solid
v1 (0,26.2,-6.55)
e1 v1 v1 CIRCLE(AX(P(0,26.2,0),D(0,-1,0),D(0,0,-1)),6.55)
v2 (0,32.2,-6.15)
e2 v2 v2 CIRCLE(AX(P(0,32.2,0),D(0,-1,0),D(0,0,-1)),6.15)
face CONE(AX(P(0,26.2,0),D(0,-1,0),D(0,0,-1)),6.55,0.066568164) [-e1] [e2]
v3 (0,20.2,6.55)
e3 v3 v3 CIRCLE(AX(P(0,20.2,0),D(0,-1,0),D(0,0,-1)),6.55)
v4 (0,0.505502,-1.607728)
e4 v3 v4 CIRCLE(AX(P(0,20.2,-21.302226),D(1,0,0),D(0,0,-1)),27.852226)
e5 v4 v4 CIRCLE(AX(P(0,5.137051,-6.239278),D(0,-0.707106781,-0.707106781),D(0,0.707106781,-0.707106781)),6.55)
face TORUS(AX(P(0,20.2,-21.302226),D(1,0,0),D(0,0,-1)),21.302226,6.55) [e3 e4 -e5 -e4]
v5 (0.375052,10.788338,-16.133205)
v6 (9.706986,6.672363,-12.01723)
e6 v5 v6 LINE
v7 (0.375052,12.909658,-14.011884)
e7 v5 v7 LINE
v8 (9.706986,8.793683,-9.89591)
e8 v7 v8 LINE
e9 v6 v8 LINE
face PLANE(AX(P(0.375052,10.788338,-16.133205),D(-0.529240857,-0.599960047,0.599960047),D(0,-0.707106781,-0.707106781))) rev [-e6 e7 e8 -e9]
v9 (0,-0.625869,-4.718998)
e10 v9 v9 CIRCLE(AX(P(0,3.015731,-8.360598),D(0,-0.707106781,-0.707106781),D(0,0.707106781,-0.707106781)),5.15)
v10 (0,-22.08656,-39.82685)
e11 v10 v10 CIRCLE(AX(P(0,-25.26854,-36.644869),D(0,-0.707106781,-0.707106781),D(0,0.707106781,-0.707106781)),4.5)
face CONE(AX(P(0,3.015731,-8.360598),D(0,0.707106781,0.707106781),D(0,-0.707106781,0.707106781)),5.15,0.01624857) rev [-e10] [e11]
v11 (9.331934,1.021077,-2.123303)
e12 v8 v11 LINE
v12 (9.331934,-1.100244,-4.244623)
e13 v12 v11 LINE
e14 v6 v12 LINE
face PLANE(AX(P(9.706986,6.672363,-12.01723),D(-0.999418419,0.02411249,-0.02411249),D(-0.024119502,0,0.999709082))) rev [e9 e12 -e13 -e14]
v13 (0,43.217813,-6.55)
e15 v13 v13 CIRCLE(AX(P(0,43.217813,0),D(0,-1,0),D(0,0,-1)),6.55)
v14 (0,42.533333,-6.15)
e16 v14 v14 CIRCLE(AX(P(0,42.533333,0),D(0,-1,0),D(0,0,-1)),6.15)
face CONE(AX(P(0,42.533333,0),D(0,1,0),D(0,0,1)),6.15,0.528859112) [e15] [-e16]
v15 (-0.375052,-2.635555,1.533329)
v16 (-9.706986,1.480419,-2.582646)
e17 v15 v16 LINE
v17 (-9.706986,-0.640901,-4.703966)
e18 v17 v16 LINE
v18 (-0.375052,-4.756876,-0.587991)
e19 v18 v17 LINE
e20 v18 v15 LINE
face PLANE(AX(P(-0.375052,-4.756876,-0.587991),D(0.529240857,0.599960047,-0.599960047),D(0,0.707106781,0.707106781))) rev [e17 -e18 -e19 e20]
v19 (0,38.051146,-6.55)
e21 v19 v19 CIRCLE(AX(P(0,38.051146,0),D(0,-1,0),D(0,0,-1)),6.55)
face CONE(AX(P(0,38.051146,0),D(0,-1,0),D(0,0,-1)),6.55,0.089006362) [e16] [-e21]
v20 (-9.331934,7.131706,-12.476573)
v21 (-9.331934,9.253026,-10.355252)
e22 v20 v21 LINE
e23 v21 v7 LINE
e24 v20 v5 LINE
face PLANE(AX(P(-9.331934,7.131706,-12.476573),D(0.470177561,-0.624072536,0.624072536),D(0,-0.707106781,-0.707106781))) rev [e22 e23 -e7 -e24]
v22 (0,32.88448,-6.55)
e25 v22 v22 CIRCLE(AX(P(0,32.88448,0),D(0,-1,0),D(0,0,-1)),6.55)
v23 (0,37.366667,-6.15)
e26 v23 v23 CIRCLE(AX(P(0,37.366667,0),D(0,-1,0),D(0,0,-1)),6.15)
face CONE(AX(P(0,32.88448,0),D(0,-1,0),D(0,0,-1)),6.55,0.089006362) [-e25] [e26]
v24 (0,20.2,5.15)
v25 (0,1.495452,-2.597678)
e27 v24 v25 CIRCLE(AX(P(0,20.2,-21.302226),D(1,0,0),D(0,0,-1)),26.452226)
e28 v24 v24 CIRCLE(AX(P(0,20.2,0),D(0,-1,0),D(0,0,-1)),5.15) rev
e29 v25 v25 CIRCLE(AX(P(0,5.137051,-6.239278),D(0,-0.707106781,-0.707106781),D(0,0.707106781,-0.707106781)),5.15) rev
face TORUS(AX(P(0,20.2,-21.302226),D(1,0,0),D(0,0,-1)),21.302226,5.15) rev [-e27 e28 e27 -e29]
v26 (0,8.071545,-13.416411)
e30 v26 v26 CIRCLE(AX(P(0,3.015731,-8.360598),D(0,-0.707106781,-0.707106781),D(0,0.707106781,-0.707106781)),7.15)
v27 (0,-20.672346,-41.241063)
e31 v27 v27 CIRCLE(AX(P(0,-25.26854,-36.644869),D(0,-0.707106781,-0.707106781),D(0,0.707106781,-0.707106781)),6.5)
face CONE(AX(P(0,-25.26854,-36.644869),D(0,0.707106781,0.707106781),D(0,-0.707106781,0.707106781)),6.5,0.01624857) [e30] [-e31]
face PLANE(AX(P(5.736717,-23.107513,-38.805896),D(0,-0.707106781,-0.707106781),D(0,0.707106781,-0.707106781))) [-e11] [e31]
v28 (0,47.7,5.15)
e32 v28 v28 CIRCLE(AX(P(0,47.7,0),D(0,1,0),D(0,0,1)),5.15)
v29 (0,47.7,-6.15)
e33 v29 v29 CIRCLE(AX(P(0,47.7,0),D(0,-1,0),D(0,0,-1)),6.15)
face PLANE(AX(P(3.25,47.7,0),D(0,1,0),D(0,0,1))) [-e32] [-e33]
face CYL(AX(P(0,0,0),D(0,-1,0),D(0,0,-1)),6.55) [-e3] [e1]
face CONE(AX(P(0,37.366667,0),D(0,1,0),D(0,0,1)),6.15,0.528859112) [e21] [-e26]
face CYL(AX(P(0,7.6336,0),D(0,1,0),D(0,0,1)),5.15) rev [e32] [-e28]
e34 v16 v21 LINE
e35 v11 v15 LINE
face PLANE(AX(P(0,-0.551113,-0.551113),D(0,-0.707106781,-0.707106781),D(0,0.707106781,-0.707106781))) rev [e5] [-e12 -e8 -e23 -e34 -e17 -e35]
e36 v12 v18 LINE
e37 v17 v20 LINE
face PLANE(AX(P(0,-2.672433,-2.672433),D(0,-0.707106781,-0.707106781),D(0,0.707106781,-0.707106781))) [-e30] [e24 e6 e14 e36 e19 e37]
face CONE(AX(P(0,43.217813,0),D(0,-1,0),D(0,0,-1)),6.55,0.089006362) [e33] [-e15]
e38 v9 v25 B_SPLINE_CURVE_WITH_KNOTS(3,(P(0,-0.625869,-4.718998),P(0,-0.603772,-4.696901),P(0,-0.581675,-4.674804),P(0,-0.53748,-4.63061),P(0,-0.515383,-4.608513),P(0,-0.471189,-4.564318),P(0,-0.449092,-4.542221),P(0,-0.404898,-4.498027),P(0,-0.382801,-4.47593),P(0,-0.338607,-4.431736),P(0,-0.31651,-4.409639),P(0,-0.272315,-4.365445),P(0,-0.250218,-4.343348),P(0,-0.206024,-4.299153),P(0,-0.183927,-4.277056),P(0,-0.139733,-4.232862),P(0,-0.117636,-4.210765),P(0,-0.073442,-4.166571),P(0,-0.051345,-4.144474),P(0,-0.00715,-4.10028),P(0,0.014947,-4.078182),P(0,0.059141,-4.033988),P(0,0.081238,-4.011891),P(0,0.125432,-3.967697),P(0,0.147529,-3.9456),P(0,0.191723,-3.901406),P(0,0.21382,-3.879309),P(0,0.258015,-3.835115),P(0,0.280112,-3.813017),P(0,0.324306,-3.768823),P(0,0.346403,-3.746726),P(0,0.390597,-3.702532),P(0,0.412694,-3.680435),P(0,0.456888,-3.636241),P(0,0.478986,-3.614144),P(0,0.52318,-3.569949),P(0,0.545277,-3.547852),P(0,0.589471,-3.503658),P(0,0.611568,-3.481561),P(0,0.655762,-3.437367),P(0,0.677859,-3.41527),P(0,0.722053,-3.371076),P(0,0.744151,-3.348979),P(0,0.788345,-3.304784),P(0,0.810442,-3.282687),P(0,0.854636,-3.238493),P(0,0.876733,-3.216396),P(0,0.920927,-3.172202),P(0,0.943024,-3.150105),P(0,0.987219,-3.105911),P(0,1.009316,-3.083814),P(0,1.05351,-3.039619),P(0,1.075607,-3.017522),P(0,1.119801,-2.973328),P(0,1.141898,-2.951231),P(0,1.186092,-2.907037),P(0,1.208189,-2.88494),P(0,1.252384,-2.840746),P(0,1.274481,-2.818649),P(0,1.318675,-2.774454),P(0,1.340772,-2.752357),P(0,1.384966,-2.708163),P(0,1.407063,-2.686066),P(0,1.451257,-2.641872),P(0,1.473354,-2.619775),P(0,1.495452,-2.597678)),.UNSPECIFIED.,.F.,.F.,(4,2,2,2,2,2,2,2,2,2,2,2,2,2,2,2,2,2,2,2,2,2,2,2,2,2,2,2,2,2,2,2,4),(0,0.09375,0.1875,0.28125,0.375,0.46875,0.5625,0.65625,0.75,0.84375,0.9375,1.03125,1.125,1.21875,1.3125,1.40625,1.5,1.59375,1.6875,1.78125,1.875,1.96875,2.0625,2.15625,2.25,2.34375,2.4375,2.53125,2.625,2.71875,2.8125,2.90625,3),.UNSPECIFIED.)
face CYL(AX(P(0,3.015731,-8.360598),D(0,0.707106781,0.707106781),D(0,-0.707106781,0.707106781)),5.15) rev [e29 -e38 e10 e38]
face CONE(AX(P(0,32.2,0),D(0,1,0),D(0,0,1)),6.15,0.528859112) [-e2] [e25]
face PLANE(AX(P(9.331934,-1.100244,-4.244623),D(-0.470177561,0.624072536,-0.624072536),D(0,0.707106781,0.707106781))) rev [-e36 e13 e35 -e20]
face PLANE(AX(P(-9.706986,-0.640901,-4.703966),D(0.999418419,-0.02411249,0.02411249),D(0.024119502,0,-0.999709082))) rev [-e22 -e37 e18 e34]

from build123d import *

# Parameters (mm, degrees)
SKETCH5_OUTSIDE_W   = 34.468
SKETCH5_OUTSIDE_H   = 34.468
CUT_EXTRUDE1_DEPTH  = 7.2
BOSS_EXTRUDE1_REACH = 51.718
SKETCH10_R          = 10.705
SKETCH10_R_2        = 6.9
BOSS_EXTRUDE3_REACH = 31.655
SKETCH12_R          = 8.3
CUT_EXTRUDE3_REACH  = 52.072
SKETCH13_R          = 4.25
CUT_EXTRUDE4_DEPTH  = 18.944444
CUT_EXTRUDE5_START  = -25.5
SKETCH19_R          = 5.15
CUT_EXTRUDE5_DEPTH  = 25.5
CUT_EXTRUDE6_START  = -43.255556
SKETCH20_R          = 28.536151212
CUT_EXTRUDE6_DEPTH  = 43.255556
SKETCH22_R          = 6.55
SKETCH22_R_2        = 5.15
SKETCH23_R          = 5.15
BOSS_EXTRUDE4_DEPTH = 3


# Read off the part's stored shape, not the designer's step: Cut-Extrude2
with BuildPart() as part:
    # Sketch1 → Revolve1 (revolve)
    with BuildSketch(Plane.XY, mode=Mode.PRIVATE) as revolve1_sk:
        Polygon((3.25, 47.7), (6.15, 47.7), (6.55, 43.217813034), (6.15, 42.533333333), (6.55, 38.051146367), (6.15, 37.366666667), (6.55, 32.8844797), (6.15, 32.2), (6.55, 26.2), (6.55, 22.2), (10.6, 22.2), (10.6, 15), (8.3, 15), (8.3, 0), (5.5, 0), (5.5, 18), (3.25, 19.7), align=None)
    revolve(revolve1_sk.sketch.rotate(Axis((0, 0, 0), (0, 1, 0)), 90), axis=Axis((0, 0, 0), (0, 1, 0)))

    # Sketch5 outside → Cut-Extrude1 (cut)
    with BuildSketch(Plane(origin=(0, 22.2, 0), x_dir=(1, 0, 0), z_dir=(0, 1, 0))):
        Rectangle(SKETCH5_OUTSIDE_W, SKETCH5_OUTSIDE_H)
        Polygon((-5.3, 9.17986928), (5.3, 9.17986928), (10.6, 0), (5.3, -9.17986928), (-5.3, -9.17986928), (-10.6, 0), align=None, mode=Mode.SUBTRACT)
    extrude(amount=-CUT_EXTRUDE1_DEPTH, mode=Mode.SUBTRACT)

    # Sketch4 → Cut-Revolve1 (revolve, cut)
    with BuildSketch(Plane.XY, mode=Mode.PRIVATE) as cut_revolve1_sk:
        Polygon((6.9, 0), (8.3, 1.4), (8.3, 0), align=None)
        Polygon((8.3, 15), (10.6, 15.837131539), (10.6, 15), align=None)
        Polygon((8.3, 22.2), (10.6, 21.362868461), (10.6, 22.2), align=None)
    revolve(cut_revolve1_sk.sketch.rotate(Axis((0, 0, 0), (0, 1, 0)), 90), axis=Axis((0, 0, 0), (0, 1, 0)), mode=Mode.SUBTRACT)

    # Boss-Extrude1: up to this cone (the profile starts outside it)
    boss_extrude1_end = Plane(origin=(0, 0, 0), z_dir=(0, 1, 0)).offset(11.979048056) * Cone(2.747e-06, 110.555614597, 40.238951944, align=(Align.CENTER, Align.CENTER, Align.MIN), mode=Mode.PRIVATE)
    # Sketch10 → Boss-Extrude1 (add, up to the surface)
    with BuildSketch(Plane.XZ, mode=Mode.PRIVATE) as boss_extrude1_sk1:
        with Locations(Location((0, 0, 0), (0, 0, 270))):
            Circle(SKETCH10_R)
        Circle(SKETCH10_R_2, mode=Mode.SUBTRACT)
    boss_extrude1_tool1 = extrude(boss_extrude1_sk1.sketch, amount=-BOSS_EXTRUDE1_REACH, mode=Mode.PRIVATE) - boss_extrude1_end
    add(boss_extrude1_tool1.solids().sort_by_distance((0, 0, 10.402217))[0])

    # Cut-Extrude2 outline → Cut-Extrude2 (revolve, cut)
    with BuildSketch(Plane.XY):
        Polygon((7.874, 16.206311111), (5.5, 18), (5.5, 0), (7.874, 0), align=None)
    revolve(axis=Axis((0, 0, 0), (0, 1, 0)), mode=Mode.SUBTRACT)

    # Boss-Extrude3: up to this cone (the profile starts inside it)
    boss_extrude3_end = Plane(origin=(0, 22.2, 0), z_dir=(0, 1, 0)).offset(-10.220951944) * Cone(2.747e-06, 193.581188051, 70.457789364, align=(Align.CENTER, Align.CENTER, Align.MIN), mode=Mode.PRIVATE)
    # Sketch12 → Boss-Extrude3 (add, up to the surface)
    with BuildSketch(Plane(origin=(0, 22.2, 0), x_dir=(1, 0, 0), z_dir=(0, 1, 0)), mode=Mode.PRIVATE) as boss_extrude3_sk1:
        Polygon((-5.415470054, 9.37986928), (-10.830940108, 0), (-5.415470054, -9.37986928), (5.415470054, -9.37986928), (10.830940108, 0), (5.415470054, 9.37986928), align=None)
        Circle(SKETCH12_R, mode=Mode.SUBTRACT)
    boss_extrude3_tool1 = extrude(boss_extrude3_sk1.sketch, amount=-BOSS_EXTRUDE3_REACH, mode=Mode.PRIVATE) & boss_extrude3_end
    add(boss_extrude3_tool1.solids().sort_by_distance((-7.875037, 22.2, -4.546655))[0])

    # Cut-Extrude3: up to this cone (the profile starts outside it)
    cut_extrude3_end = Plane(origin=(0, 47.7, 0), z_dir=(0, -1, 0)).offset(25.544445444) * Cone(1.324e-06, 35.771764706, 27.027554556, align=(Align.CENTER, Align.CENTER, Align.MIN), mode=Mode.PRIVATE)
    # Sketch13 → Cut-Extrude3 (cut, up to the surface)
    with BuildSketch(Plane(origin=(0, 47.7, 0), x_dir=(1, 0, 0), z_dir=(0, 1, 0)), mode=Mode.PRIVATE) as cut_extrude3_sk1:
        with Locations(Location((0, 0, 0), (0, 0, 270))):
            Circle(SKETCH13_R)
    cut_extrude3_tool1 = extrude(cut_extrude3_sk1.sketch, amount=-CUT_EXTRUDE3_REACH, mode=Mode.PRIVATE) - cut_extrude3_end
    add(cut_extrude3_tool1.solids().sort_by_distance((0, 47.7, 0))[0], mode=Mode.SUBTRACT)

    # Sketch15 → Cut-Extrude4 (cut)
    with BuildSketch(Plane(origin=(0, 18.944444444, 0), x_dir=(-1, 0, 0), z_dir=(0, -1, 0))):
        Polygon((11.188972746, 19.37986928), (-11.188972746, 19.37986928), (-22.377945491, 0), (-11.188972746, -19.37986928), (11.188972746, -19.37986928), (22.377945491, 0), align=None)
    extrude(amount=CUT_EXTRUDE4_DEPTH, mode=Mode.SUBTRACT)

    # Sketch18 → Revolve2 (revolve)
    with BuildSketch(Plane(origin=(0, 0, 0), x_dir=(0, 0, -1), z_dir=(1, 0, 0))):
        Polygon((4.25, 18.944444444), (3.551797403, -21.055555556), (4.551797403, -21.055555556), (5.25, 18.944444444), align=None)
    revolve(axis=Axis((0, 18.944444444, 0), (0, 1, 0)))

    # Sketch19 → Cut-Extrude5 (cut)
    with BuildSketch(Plane(origin=(0, 47.7, 0), x_dir=(1, 0, 0), z_dir=(0, 1, 0)).offset(CUT_EXTRUDE5_START)):
        with Locations(Location((0, 0, 0), (0, 0, 270))):
            Circle(SKETCH19_R)
    extrude(amount=CUT_EXTRUDE5_DEPTH, mode=Mode.SUBTRACT)

    # Sketch20 → Cut-Extrude6 (cut)
    with BuildSketch(Plane.XZ.offset(21.055555556).offset(CUT_EXTRUDE6_START)):
        Circle(SKETCH20_R)
    extrude(amount=CUT_EXTRUDE6_DEPTH, mode=Mode.SUBTRACT)

    # Sweep2: sweep along a path in Sketch21
    with BuildLine(Plane(origin=(0, 0, 0), x_dir=(0, 0, -1), z_dir=(1, 0, 0))) as sweep2_path:
        Line((0, 22.2), (0, 20.2))
        ThreePointArc((0, 20.2), (1.621535411, 12.04799099), (6.239277577, 5.137051454))
    # Sketch22 → Sweep2 (sweep)
    with BuildSketch(Plane.XZ.offset(-22.2)):
        Circle(SKETCH22_R)
        Circle(SKETCH22_R_2, mode=Mode.SUBTRACT)
    sweep(path=sweep2_path.line)

    # Sketch23 → Boss-Extrude4 (add)
    with BuildSketch(Plane(origin=(0, -0.551113062, -0.551113062), x_dir=(1, 0, 0), z_dir=(0, -0.7071067811865513, -0.7071067811865437))):
        Polygon((9.706986403, -13.21553795), (9.331934473, -2.223411857), (-0.37505193, 2.947846691), (-9.706986403, -2.873020855), (-9.331934473, -13.865146949), (0.37505193, -19.036405496), align=None)
        with Locations(Location((0, -8.044279403, 0), (0, 0, 90))):
            Circle(SKETCH23_R, mode=Mode.SUBTRACT)
    extrude(amount=BOSS_EXTRUDE4_DEPTH)

    # Sketch26 → Revolve3 (revolve)
    with BuildSketch(Plane(origin=(-3.338098244, 4.430699396, -4.430699396), x_dir=(0.8825718445701068, 0.33246574197360307, -0.3324657419736067), z_dir=(0.47017756132350597, -0.6240725361798388, 0.6240725361798455)), mode=Mode.PRIVATE) as revolve3_sk:
        Polygon((10.932239672, -3.779391566), (10.282239672, -43.779391566), (8.282239672, -43.779391566), (8.932239672, -3.779391566), align=None)
    revolve(revolve3_sk.sketch.rotate(Axis((0, -0.625868813, -12.002197844), (0, 0.7071067811865513, 0.7071067811865438)), 61.954176959), axis=Axis((0, -0.625868813, -12.002197844), (0, 0.7071067811865513, 0.7071067811865438)))


solid = part.part
